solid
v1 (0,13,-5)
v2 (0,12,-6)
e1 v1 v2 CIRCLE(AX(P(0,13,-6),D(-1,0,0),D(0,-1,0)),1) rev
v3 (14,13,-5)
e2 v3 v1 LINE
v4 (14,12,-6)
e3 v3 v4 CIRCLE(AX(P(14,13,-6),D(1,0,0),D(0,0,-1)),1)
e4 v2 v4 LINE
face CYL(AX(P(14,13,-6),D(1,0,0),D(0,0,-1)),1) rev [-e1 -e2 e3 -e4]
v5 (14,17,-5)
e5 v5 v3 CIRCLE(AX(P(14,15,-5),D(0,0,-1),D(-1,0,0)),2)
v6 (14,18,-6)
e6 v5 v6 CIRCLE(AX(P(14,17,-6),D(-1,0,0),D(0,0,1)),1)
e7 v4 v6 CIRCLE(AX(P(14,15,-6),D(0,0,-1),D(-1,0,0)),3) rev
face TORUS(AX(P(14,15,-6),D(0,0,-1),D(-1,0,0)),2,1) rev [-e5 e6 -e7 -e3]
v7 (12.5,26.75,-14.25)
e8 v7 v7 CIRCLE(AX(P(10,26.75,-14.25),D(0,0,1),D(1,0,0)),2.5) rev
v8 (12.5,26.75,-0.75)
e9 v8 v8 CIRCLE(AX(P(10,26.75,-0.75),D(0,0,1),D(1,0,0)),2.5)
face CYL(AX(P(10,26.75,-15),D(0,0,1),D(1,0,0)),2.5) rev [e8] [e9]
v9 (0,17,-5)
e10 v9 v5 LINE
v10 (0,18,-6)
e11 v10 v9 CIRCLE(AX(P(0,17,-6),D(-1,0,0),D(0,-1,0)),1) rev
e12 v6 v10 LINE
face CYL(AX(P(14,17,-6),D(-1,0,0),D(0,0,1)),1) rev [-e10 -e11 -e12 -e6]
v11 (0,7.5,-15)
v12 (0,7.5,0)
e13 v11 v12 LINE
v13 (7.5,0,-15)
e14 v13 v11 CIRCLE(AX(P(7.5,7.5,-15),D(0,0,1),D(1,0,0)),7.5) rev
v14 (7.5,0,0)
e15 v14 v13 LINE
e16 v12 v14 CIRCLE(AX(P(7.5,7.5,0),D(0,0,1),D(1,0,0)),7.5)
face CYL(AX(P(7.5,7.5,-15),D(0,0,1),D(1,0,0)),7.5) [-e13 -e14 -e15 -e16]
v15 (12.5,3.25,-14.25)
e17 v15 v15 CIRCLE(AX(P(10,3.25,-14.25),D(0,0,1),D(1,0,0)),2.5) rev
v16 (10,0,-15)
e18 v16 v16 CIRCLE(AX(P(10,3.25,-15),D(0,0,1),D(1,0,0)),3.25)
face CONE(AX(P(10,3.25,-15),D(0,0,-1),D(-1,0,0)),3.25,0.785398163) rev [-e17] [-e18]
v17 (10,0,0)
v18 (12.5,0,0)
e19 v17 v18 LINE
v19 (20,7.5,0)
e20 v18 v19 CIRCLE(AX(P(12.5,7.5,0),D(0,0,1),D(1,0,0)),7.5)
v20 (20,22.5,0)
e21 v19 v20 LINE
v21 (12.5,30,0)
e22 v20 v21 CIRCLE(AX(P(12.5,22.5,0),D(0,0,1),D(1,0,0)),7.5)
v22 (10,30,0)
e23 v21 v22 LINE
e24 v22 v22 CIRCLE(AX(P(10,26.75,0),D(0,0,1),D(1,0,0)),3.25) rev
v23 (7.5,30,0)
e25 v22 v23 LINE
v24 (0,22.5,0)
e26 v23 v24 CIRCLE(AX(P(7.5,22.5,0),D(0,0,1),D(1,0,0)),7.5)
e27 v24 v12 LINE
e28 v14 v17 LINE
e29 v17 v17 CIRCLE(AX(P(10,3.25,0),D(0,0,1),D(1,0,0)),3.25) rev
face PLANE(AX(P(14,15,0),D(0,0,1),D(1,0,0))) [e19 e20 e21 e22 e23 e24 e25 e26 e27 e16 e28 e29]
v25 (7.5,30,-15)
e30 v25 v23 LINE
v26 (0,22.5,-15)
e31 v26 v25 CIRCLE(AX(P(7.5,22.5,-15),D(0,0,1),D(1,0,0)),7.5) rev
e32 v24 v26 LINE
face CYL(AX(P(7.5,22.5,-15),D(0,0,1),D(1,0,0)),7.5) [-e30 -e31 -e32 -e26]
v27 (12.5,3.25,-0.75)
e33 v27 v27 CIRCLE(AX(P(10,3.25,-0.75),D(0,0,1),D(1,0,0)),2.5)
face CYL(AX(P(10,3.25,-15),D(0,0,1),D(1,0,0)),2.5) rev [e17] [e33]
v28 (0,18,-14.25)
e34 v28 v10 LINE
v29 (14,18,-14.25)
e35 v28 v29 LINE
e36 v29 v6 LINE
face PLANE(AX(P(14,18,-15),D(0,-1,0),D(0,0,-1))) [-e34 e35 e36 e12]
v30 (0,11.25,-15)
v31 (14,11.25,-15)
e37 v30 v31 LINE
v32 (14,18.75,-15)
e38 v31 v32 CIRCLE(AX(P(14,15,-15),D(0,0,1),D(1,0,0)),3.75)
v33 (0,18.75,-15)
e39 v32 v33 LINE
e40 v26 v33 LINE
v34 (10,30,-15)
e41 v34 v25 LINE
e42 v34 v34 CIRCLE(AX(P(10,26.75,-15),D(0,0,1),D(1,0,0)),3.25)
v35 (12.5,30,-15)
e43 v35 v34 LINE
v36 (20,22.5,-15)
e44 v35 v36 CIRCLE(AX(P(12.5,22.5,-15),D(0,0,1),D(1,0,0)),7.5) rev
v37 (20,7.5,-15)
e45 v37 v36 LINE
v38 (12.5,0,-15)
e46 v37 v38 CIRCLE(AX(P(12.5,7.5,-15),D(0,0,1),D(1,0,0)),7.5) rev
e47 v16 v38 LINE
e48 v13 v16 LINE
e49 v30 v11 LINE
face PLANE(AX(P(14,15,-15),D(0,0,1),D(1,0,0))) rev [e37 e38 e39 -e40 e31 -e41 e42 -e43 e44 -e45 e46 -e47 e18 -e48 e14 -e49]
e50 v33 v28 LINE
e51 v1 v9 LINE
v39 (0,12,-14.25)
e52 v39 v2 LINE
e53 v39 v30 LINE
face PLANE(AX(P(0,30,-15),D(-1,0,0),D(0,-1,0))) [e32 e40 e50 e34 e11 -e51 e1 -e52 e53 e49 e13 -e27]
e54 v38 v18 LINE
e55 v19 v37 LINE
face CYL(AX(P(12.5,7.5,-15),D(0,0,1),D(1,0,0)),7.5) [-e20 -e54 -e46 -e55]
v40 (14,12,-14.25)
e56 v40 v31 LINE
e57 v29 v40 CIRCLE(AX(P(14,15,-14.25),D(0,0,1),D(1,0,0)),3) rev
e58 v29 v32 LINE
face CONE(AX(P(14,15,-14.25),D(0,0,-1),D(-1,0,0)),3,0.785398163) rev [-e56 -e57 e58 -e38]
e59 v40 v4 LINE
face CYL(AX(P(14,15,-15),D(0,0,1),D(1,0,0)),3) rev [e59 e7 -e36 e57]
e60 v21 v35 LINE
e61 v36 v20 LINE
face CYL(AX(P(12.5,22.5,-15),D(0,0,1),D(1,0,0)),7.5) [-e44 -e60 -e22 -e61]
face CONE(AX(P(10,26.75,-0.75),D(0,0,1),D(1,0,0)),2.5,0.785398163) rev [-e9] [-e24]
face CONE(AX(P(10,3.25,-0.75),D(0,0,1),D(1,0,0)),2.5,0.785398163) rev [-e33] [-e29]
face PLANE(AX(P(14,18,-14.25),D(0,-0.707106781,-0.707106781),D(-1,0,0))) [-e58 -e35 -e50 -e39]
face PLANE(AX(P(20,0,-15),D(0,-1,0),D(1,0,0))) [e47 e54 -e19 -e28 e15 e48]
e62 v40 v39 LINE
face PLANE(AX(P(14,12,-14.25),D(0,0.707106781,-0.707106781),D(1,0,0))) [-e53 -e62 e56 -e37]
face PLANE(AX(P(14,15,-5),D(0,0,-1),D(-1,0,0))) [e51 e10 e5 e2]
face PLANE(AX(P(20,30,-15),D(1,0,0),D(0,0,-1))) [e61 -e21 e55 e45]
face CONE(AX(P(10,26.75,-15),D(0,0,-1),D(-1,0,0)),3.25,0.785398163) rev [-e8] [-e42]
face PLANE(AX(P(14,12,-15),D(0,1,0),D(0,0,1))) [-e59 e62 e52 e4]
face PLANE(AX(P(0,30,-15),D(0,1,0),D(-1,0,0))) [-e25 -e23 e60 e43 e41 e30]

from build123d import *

# Parameters (mm, degrees)
CROQUIS1_R              = 2.5
BRIDA_BASE1_DEPTH       = 15
REDONDEO1_R             = 7.5
CHAFL_N1_SIZE           = 0.75
SALIENTE_EXTRUIR1_DEPTH = 5
REDONDEO2_R             = 1


# Sheet-metal steps are written as plain solids
with BuildPart() as part:
    # Croquis1 → Brida base1 (new body)
    with BuildSketch(Plane.XY):
        with BuildLine():
            Line((0, 30), (0, 18))
            Line((0, 18), (14, 18))
            ThreePointArc((14, 18), (17, 15), (14, 12))
            Line((14, 12), (0, 12))
            Line((0, 12), (0, 0))
            Line((0, 0), (20, 0))
            Line((20, 0), (20, 30))
            Line((20, 30), (0, 30))
        make_face()
        with Locations(Location((10, 3.25, 0), (0, 0, 180))):
            Circle(CROQUIS1_R, mode=Mode.SUBTRACT)
        with Locations((10, 26.75)):
            Circle(CROQUIS1_R, mode=Mode.SUBTRACT)
    extrude(amount=-BRIDA_BASE1_DEPTH)

    # Redondeo1
    redondeo1_edges = [part.edges().sort_by_distance(p)[0] for p in [
        (0, 30, -7.5),
        (20, 30, -7.5),
        (20, 0, -7.5),
        (0, 0, -7.5),
    ]]
    fillet(redondeo1_edges, radius=REDONDEO1_R)

    # Chaflán1
    chafl_n1_edges = [part.edges().sort_by_distance(p)[0] for p in [
        (7, 18, -15),
        (12.5, 3.25, -15),
        (12.5, 3.25, 0),
        (17, 15, -15),
        (7.5, 26.75, -15),
        (7.5, 26.75, 0),
        (7, 12, -15),
    ]]
    chamfer(chafl_n1_edges, length=CHAFL_N1_SIZE - 0.0001)  # a hair under: the kernel refuses the full size

    # Croquis2 → Saliente-Extruir1 (add)
    with BuildSketch(Plane(origin=(0, 0, 0), x_dir=(-1, 0, 0), z_dir=(0, 0, -1))):
        with BuildLine():
            Line((0, 18), (-14, 18))
            ThreePointArc((-14, 18), (-17, 15), (-14, 12))
            Line((-14, 12), (0, 12))
            Line((0, 12), (0, 18))
        make_face()
    extrude(amount=SALIENTE_EXTRUIR1_DEPTH)

    # Redondeo2
    redondeo2_edges = [part.edges().sort_by_distance(p)[0] for p in [
        (7, 18, -5),
        (17, 15, -5),
        (7, 12, -5),
    ]]
    fillet(redondeo2_edges, radius=REDONDEO2_R)


solid = part.part
